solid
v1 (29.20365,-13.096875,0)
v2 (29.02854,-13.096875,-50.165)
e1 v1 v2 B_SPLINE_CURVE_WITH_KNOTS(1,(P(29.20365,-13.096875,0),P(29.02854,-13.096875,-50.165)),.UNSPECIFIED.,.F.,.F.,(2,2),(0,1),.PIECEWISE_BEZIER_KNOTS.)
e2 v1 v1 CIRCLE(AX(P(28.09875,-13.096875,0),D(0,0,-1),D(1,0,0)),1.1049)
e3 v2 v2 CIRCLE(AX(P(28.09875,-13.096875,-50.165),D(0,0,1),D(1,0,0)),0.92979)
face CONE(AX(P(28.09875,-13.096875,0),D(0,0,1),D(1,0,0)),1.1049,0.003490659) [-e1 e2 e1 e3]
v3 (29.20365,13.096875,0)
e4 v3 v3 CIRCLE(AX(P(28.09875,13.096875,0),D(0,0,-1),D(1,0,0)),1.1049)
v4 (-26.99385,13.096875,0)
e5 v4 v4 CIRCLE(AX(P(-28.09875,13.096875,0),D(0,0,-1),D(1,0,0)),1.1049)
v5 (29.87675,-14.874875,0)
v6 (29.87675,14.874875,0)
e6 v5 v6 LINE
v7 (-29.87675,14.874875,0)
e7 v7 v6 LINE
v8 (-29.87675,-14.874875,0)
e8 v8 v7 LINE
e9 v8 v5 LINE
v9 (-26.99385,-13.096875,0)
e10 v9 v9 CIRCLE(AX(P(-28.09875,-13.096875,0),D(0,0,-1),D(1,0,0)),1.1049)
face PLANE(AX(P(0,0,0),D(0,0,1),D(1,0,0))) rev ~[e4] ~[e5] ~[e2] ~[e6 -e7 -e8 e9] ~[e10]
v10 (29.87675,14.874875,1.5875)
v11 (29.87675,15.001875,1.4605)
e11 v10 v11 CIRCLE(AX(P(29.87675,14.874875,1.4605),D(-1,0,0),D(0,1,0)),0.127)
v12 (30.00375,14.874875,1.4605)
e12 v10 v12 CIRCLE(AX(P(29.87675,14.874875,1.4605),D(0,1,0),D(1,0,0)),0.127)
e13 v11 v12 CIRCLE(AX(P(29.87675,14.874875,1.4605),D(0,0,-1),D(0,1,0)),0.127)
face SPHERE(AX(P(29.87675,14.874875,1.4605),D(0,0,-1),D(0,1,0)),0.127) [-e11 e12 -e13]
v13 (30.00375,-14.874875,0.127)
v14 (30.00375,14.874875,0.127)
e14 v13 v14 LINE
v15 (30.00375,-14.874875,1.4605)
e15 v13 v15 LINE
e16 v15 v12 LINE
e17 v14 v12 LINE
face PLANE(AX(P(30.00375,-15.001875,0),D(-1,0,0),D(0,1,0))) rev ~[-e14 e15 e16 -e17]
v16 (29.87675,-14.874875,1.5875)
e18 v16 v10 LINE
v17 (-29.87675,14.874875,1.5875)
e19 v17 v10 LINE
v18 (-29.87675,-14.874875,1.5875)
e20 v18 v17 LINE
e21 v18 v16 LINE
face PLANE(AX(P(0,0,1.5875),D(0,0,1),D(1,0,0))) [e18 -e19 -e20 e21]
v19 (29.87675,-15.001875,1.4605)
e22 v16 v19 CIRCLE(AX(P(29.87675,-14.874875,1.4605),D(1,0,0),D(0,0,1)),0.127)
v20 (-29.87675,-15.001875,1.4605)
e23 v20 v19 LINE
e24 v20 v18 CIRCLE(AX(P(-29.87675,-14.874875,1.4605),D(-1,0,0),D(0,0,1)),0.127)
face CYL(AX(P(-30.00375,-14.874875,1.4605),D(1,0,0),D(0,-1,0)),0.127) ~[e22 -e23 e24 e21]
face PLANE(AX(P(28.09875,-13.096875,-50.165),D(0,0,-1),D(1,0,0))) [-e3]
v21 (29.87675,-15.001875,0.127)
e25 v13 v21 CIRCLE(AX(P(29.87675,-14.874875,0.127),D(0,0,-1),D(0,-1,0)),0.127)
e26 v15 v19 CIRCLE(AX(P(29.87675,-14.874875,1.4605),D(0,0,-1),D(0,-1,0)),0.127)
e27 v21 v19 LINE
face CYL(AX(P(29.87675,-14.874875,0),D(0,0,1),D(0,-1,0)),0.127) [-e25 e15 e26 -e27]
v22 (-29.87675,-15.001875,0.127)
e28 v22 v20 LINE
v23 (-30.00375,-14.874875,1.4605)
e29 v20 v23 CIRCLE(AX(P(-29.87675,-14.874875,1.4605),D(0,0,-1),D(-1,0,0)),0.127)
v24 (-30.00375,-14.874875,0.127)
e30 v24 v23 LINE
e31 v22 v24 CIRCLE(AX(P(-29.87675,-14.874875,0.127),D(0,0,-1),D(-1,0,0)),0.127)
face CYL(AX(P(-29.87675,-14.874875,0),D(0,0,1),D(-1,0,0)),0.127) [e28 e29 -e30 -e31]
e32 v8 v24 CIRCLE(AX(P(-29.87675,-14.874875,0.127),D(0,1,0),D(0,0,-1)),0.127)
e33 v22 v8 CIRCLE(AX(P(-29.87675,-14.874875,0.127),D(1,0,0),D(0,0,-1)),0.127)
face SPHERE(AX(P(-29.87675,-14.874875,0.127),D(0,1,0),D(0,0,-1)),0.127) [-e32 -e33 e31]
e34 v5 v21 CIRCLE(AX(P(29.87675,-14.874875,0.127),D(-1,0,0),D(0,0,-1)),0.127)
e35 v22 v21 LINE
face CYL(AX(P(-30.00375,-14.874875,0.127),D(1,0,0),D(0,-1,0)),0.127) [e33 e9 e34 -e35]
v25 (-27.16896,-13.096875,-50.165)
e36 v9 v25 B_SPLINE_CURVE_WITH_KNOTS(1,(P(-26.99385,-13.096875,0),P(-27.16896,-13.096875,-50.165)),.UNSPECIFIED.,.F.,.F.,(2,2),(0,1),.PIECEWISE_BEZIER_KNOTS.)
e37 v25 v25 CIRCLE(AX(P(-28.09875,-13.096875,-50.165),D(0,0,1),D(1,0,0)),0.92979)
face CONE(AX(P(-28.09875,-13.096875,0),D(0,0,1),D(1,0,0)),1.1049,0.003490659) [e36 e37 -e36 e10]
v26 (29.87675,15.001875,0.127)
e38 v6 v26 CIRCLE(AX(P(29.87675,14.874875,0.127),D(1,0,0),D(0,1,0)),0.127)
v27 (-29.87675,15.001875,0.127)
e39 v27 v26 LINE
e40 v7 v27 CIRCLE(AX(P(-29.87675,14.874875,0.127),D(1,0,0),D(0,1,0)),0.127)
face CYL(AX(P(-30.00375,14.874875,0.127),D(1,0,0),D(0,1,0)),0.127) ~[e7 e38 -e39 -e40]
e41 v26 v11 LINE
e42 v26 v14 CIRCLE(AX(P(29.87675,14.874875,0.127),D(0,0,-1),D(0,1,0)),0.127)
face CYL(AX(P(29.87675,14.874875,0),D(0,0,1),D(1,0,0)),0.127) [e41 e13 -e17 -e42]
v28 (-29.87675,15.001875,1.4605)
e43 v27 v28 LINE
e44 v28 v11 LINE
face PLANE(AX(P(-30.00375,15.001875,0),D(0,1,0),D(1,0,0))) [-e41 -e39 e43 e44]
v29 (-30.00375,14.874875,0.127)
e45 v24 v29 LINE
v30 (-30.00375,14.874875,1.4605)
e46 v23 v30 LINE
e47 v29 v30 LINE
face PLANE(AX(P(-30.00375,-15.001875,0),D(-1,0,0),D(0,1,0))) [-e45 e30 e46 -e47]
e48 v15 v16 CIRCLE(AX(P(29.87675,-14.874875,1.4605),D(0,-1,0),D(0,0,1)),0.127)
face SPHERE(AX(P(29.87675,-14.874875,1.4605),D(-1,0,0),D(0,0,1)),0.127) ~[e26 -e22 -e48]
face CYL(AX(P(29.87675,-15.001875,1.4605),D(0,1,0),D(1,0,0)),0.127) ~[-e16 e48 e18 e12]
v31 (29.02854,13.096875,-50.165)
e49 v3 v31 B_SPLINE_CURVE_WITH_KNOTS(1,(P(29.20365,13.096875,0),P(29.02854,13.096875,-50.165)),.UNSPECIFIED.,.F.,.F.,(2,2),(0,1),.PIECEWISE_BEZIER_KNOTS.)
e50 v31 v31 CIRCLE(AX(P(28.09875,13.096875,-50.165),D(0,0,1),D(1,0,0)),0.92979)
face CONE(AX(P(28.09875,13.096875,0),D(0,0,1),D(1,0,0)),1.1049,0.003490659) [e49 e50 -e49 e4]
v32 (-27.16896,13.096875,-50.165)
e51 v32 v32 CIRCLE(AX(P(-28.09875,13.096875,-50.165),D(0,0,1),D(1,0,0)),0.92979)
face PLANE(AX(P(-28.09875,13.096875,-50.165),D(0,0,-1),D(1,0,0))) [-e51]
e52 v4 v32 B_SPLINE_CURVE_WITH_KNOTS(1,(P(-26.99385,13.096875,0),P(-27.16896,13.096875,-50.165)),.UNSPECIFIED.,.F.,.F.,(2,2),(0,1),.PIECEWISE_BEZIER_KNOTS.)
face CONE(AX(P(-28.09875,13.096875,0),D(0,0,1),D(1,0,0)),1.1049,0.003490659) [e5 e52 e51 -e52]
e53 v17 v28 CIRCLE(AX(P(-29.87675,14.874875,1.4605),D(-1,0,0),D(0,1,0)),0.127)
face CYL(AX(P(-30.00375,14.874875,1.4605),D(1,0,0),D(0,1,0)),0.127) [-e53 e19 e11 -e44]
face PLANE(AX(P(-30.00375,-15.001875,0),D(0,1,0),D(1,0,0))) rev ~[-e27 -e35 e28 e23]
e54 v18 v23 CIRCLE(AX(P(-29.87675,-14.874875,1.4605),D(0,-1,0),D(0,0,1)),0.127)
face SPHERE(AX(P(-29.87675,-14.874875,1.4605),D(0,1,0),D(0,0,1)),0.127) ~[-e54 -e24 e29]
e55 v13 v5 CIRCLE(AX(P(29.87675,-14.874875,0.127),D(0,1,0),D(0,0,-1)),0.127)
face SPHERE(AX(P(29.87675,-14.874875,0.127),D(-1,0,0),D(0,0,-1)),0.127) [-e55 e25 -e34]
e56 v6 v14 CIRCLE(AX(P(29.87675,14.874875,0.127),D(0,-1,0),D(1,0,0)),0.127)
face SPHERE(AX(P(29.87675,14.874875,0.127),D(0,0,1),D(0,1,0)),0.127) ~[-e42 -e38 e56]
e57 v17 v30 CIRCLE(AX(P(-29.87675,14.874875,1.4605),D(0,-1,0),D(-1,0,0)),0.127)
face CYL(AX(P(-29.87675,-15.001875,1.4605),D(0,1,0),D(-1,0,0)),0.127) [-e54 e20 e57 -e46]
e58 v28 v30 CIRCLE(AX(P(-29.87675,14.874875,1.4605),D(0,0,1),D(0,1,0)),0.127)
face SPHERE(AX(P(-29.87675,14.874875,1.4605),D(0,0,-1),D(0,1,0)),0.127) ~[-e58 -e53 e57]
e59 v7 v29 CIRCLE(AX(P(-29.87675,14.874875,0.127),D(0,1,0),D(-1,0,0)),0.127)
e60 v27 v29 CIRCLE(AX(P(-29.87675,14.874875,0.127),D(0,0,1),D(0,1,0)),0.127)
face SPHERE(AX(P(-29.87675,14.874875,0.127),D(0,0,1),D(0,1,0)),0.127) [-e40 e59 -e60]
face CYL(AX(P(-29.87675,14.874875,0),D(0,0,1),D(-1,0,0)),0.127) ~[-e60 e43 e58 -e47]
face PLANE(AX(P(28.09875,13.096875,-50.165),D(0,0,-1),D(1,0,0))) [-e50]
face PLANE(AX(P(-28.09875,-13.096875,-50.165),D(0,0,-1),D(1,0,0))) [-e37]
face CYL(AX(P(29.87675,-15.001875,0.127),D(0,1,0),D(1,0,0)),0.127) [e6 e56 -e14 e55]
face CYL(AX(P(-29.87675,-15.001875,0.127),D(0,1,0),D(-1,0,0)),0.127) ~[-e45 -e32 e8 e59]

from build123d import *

# Parameters (mm, degrees)
F0_W     = 1200.15
F0_H     = 600.075
F1_DEPTH = 31.75
F2_R     = 2.54
F3_R     = 22.098
F4_DEPTH = 1003.3
F4_TAPER = 0.2
F5_SCALE = 0.05


with BuildPart() as f1:
    # F0 (on Top) → F1 (new body)
    with BuildSketch(Plane.XY):
        Rectangle(F0_W, F0_H)
    extrude(amount=F1_DEPTH)

    # F2
    f2_edges = [f1.edges().sort_by_distance(p)[0] for p in [
        (600.075, 300.0375, 15.875),
        (-600.075, 300.0375, 15.875),
        (0, 300.0375, 0),
        (0, 300.0375, 31.75),
        (-600.075, 0, 0),
        (0, -300.0375, 0),
        (600.075, 0, 0),
        (-600.075, 0, 31.75),
        (0, -300.0375, 31.75),
        (600.075, 0, 31.75),
        (-600.075, -300.0375, 15.875),
        (600.075, -300.0375, 15.875),
    ]]
    fillet(f2_edges, radius=F2_R)

    # F3 (on face) → F4 (join)
    with BuildSketch(Plane(origin=(0, 0, 0), x_dir=(1, 0, 0), z_dir=(0, 0, -1))):
        with Locations((-561.975, 261.9375)):
            Circle(F3_R)
        with Locations((561.975, 261.9375)):
            Circle(F3_R)
        with Locations((-561.975, -261.9375)):
            Circle(F3_R)
        with Locations((561.975, -261.9375)):
            Circle(F3_R)
    extrude(amount=F4_DEPTH, taper=F4_TAPER)


with BuildPart() as f1_1:
    # F5: moved
    add(f1.part.scale(F5_SCALE))


solid = f1_1.part
